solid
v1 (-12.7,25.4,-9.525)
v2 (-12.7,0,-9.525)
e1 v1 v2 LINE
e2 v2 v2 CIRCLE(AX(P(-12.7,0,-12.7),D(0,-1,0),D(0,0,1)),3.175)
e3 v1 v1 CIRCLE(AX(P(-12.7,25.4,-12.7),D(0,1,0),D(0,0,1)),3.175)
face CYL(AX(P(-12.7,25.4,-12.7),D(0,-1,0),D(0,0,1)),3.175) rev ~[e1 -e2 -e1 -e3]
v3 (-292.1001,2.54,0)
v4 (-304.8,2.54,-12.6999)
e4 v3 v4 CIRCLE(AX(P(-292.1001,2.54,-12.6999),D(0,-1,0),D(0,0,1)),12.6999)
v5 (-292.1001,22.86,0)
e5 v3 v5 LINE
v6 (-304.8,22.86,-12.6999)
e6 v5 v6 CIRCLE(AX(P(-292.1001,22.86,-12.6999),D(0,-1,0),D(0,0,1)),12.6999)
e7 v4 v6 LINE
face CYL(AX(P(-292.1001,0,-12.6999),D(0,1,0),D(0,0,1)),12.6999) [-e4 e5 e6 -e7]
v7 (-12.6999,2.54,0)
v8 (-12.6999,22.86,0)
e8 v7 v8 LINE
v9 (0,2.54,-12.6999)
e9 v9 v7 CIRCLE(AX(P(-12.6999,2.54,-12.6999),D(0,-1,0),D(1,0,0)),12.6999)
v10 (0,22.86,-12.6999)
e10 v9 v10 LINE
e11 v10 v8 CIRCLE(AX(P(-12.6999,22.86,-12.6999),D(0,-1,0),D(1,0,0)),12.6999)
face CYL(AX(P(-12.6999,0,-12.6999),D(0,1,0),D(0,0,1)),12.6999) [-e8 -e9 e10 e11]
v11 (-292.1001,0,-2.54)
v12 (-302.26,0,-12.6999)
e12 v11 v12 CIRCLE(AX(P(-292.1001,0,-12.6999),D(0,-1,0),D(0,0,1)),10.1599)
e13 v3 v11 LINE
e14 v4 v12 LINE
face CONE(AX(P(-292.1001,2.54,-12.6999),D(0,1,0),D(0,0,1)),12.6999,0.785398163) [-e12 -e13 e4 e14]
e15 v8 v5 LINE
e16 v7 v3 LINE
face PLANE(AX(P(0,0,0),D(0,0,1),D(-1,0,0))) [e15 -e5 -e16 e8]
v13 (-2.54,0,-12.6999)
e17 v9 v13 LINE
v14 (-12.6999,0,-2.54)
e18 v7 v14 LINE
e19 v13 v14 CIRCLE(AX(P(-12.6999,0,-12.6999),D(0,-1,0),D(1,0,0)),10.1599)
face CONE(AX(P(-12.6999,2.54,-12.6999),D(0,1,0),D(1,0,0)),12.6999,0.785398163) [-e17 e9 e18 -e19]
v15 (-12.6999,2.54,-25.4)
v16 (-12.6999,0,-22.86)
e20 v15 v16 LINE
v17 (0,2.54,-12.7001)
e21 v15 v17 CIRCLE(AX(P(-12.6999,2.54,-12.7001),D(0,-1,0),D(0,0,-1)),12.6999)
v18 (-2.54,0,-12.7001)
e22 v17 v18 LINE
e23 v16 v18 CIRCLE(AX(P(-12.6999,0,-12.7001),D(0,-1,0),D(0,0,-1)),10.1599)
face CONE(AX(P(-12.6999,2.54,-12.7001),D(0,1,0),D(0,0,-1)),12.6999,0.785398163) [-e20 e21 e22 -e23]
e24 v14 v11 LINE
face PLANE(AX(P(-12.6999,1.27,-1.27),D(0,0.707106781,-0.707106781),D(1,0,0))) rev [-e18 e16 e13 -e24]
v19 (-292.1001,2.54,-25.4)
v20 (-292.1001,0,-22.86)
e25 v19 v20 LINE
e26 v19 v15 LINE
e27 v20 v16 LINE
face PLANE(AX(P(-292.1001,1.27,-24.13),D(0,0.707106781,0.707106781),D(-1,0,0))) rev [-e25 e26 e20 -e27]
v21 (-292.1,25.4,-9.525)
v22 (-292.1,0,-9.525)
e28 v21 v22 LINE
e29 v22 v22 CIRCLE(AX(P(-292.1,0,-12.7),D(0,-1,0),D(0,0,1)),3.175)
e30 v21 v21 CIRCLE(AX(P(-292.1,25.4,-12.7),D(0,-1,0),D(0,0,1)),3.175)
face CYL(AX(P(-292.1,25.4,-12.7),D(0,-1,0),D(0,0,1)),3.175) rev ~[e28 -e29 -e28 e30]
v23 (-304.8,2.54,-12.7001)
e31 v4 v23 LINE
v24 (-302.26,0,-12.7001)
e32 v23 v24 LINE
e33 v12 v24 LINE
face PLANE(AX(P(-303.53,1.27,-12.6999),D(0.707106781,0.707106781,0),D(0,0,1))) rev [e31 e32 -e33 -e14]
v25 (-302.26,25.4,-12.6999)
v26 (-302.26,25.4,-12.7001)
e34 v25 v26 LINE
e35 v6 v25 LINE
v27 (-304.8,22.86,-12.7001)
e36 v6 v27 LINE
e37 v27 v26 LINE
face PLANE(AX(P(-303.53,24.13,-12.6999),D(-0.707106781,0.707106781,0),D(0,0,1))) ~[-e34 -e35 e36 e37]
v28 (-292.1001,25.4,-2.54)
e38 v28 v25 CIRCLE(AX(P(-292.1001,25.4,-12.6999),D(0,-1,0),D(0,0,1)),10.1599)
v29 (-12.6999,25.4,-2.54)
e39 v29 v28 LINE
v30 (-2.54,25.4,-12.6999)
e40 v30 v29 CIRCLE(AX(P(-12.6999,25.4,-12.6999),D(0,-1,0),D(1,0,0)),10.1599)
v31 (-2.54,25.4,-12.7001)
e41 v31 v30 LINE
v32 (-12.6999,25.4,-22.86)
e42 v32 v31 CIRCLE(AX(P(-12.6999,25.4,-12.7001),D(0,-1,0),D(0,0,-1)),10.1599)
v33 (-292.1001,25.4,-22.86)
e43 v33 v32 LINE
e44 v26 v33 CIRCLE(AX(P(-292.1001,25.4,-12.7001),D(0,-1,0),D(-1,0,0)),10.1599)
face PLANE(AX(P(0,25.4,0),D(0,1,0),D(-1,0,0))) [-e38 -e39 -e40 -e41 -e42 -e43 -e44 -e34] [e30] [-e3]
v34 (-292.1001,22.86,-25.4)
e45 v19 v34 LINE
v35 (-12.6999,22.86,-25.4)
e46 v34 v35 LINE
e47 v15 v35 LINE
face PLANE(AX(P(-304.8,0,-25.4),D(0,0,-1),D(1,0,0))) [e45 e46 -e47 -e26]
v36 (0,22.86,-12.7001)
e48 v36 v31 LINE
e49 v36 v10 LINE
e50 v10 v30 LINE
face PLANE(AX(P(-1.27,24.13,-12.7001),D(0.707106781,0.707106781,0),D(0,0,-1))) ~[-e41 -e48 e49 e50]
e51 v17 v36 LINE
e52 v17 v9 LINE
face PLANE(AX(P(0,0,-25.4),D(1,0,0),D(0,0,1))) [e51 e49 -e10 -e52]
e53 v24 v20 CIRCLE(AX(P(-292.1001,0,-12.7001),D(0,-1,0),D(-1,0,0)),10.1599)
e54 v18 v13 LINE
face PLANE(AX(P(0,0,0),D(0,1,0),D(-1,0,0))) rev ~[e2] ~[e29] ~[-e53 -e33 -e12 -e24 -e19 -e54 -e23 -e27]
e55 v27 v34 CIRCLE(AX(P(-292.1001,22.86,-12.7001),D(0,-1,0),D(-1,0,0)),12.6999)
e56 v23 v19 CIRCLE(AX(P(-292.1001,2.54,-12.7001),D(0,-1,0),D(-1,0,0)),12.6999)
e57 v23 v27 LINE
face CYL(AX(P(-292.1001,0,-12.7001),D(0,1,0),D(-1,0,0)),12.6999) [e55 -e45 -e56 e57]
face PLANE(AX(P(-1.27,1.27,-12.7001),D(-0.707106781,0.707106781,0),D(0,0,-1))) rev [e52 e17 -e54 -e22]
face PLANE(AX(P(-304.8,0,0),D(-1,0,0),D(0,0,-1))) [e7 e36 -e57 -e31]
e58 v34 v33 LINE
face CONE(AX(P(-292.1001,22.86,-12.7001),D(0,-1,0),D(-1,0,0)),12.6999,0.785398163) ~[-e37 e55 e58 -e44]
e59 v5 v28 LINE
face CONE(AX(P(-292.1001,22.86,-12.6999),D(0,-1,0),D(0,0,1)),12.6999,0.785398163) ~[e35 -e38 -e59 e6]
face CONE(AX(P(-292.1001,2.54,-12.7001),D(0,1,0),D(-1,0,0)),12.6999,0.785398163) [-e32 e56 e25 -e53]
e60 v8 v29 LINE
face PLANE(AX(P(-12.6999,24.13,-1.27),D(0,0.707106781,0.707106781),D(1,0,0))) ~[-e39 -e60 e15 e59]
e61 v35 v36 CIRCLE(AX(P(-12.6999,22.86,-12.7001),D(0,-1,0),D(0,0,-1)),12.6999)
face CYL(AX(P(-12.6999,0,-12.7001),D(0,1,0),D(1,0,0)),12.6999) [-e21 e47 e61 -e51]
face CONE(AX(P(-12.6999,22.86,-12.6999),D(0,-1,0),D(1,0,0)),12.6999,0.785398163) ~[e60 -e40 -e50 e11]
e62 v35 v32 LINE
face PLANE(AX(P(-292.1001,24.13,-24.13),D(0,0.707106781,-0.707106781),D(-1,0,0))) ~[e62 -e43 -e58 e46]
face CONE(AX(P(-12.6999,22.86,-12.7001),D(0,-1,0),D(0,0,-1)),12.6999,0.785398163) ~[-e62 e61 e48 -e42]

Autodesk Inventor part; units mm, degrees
ref_plane "YZ Plane" through (0, 0, 0) normal (1, 0, 0) x (0, 1, 0)
ref_plane "XZ Plane" through (0, 0, 0) normal (0, 1, 0) x (-1, 0, 0)
sketch "Sketch1" plane through (0, 0, 0) normal (0, 1, 0) x (-1, 0, 0)
  line L0 (0, 0) -> (304.8, 0)
  line L1 (304.8, 0) -> (304.8, -25.4)
  line L2 (304.8, -25.4) -> (0, -25.4)
  line L3 (0, -25.4) -> (0, 0)
  dimension "d0" = 304.8
  dimension "d1" = 25.4
extrude "Extrusion1" add sketch "Sketch1" along normal blind 25.4
hole "Hole1" at (-292.1, 25.4, -12.7) direction (0, -1, 0) diameter 6.35 end through all
ref_plane "Work Plane1" through (-152.4, 0, 0) normal (1, 0, 0) x (0, 0, -1)
mirror "Mirror1" about plane through (-152.4, 0, 0) normal (1, 0, 0) of "Hole1"
fillet "Fillet1" radius 12.7 4 edges at (-304.8, 12.7, -25.4) (-304.8, 12.7, 0) (0, 12.7, -25.4) (0, 12.7, 0)
chamfer "Chamfer1" distance 2.54 angle 45 8 edges at (-152.4, 25.4, 0) (-3.7197, 25.4, -21.6803) (-152.4, 25.4, -25.4) (-301.0803, 25.4, -21.6803) (-152.4, 0, 0) (-301.0803, 0, -21.6803) (-152.4, 0, -25.4) (-3.7197, 0, -21.6803)
properties part number "longerBar"
